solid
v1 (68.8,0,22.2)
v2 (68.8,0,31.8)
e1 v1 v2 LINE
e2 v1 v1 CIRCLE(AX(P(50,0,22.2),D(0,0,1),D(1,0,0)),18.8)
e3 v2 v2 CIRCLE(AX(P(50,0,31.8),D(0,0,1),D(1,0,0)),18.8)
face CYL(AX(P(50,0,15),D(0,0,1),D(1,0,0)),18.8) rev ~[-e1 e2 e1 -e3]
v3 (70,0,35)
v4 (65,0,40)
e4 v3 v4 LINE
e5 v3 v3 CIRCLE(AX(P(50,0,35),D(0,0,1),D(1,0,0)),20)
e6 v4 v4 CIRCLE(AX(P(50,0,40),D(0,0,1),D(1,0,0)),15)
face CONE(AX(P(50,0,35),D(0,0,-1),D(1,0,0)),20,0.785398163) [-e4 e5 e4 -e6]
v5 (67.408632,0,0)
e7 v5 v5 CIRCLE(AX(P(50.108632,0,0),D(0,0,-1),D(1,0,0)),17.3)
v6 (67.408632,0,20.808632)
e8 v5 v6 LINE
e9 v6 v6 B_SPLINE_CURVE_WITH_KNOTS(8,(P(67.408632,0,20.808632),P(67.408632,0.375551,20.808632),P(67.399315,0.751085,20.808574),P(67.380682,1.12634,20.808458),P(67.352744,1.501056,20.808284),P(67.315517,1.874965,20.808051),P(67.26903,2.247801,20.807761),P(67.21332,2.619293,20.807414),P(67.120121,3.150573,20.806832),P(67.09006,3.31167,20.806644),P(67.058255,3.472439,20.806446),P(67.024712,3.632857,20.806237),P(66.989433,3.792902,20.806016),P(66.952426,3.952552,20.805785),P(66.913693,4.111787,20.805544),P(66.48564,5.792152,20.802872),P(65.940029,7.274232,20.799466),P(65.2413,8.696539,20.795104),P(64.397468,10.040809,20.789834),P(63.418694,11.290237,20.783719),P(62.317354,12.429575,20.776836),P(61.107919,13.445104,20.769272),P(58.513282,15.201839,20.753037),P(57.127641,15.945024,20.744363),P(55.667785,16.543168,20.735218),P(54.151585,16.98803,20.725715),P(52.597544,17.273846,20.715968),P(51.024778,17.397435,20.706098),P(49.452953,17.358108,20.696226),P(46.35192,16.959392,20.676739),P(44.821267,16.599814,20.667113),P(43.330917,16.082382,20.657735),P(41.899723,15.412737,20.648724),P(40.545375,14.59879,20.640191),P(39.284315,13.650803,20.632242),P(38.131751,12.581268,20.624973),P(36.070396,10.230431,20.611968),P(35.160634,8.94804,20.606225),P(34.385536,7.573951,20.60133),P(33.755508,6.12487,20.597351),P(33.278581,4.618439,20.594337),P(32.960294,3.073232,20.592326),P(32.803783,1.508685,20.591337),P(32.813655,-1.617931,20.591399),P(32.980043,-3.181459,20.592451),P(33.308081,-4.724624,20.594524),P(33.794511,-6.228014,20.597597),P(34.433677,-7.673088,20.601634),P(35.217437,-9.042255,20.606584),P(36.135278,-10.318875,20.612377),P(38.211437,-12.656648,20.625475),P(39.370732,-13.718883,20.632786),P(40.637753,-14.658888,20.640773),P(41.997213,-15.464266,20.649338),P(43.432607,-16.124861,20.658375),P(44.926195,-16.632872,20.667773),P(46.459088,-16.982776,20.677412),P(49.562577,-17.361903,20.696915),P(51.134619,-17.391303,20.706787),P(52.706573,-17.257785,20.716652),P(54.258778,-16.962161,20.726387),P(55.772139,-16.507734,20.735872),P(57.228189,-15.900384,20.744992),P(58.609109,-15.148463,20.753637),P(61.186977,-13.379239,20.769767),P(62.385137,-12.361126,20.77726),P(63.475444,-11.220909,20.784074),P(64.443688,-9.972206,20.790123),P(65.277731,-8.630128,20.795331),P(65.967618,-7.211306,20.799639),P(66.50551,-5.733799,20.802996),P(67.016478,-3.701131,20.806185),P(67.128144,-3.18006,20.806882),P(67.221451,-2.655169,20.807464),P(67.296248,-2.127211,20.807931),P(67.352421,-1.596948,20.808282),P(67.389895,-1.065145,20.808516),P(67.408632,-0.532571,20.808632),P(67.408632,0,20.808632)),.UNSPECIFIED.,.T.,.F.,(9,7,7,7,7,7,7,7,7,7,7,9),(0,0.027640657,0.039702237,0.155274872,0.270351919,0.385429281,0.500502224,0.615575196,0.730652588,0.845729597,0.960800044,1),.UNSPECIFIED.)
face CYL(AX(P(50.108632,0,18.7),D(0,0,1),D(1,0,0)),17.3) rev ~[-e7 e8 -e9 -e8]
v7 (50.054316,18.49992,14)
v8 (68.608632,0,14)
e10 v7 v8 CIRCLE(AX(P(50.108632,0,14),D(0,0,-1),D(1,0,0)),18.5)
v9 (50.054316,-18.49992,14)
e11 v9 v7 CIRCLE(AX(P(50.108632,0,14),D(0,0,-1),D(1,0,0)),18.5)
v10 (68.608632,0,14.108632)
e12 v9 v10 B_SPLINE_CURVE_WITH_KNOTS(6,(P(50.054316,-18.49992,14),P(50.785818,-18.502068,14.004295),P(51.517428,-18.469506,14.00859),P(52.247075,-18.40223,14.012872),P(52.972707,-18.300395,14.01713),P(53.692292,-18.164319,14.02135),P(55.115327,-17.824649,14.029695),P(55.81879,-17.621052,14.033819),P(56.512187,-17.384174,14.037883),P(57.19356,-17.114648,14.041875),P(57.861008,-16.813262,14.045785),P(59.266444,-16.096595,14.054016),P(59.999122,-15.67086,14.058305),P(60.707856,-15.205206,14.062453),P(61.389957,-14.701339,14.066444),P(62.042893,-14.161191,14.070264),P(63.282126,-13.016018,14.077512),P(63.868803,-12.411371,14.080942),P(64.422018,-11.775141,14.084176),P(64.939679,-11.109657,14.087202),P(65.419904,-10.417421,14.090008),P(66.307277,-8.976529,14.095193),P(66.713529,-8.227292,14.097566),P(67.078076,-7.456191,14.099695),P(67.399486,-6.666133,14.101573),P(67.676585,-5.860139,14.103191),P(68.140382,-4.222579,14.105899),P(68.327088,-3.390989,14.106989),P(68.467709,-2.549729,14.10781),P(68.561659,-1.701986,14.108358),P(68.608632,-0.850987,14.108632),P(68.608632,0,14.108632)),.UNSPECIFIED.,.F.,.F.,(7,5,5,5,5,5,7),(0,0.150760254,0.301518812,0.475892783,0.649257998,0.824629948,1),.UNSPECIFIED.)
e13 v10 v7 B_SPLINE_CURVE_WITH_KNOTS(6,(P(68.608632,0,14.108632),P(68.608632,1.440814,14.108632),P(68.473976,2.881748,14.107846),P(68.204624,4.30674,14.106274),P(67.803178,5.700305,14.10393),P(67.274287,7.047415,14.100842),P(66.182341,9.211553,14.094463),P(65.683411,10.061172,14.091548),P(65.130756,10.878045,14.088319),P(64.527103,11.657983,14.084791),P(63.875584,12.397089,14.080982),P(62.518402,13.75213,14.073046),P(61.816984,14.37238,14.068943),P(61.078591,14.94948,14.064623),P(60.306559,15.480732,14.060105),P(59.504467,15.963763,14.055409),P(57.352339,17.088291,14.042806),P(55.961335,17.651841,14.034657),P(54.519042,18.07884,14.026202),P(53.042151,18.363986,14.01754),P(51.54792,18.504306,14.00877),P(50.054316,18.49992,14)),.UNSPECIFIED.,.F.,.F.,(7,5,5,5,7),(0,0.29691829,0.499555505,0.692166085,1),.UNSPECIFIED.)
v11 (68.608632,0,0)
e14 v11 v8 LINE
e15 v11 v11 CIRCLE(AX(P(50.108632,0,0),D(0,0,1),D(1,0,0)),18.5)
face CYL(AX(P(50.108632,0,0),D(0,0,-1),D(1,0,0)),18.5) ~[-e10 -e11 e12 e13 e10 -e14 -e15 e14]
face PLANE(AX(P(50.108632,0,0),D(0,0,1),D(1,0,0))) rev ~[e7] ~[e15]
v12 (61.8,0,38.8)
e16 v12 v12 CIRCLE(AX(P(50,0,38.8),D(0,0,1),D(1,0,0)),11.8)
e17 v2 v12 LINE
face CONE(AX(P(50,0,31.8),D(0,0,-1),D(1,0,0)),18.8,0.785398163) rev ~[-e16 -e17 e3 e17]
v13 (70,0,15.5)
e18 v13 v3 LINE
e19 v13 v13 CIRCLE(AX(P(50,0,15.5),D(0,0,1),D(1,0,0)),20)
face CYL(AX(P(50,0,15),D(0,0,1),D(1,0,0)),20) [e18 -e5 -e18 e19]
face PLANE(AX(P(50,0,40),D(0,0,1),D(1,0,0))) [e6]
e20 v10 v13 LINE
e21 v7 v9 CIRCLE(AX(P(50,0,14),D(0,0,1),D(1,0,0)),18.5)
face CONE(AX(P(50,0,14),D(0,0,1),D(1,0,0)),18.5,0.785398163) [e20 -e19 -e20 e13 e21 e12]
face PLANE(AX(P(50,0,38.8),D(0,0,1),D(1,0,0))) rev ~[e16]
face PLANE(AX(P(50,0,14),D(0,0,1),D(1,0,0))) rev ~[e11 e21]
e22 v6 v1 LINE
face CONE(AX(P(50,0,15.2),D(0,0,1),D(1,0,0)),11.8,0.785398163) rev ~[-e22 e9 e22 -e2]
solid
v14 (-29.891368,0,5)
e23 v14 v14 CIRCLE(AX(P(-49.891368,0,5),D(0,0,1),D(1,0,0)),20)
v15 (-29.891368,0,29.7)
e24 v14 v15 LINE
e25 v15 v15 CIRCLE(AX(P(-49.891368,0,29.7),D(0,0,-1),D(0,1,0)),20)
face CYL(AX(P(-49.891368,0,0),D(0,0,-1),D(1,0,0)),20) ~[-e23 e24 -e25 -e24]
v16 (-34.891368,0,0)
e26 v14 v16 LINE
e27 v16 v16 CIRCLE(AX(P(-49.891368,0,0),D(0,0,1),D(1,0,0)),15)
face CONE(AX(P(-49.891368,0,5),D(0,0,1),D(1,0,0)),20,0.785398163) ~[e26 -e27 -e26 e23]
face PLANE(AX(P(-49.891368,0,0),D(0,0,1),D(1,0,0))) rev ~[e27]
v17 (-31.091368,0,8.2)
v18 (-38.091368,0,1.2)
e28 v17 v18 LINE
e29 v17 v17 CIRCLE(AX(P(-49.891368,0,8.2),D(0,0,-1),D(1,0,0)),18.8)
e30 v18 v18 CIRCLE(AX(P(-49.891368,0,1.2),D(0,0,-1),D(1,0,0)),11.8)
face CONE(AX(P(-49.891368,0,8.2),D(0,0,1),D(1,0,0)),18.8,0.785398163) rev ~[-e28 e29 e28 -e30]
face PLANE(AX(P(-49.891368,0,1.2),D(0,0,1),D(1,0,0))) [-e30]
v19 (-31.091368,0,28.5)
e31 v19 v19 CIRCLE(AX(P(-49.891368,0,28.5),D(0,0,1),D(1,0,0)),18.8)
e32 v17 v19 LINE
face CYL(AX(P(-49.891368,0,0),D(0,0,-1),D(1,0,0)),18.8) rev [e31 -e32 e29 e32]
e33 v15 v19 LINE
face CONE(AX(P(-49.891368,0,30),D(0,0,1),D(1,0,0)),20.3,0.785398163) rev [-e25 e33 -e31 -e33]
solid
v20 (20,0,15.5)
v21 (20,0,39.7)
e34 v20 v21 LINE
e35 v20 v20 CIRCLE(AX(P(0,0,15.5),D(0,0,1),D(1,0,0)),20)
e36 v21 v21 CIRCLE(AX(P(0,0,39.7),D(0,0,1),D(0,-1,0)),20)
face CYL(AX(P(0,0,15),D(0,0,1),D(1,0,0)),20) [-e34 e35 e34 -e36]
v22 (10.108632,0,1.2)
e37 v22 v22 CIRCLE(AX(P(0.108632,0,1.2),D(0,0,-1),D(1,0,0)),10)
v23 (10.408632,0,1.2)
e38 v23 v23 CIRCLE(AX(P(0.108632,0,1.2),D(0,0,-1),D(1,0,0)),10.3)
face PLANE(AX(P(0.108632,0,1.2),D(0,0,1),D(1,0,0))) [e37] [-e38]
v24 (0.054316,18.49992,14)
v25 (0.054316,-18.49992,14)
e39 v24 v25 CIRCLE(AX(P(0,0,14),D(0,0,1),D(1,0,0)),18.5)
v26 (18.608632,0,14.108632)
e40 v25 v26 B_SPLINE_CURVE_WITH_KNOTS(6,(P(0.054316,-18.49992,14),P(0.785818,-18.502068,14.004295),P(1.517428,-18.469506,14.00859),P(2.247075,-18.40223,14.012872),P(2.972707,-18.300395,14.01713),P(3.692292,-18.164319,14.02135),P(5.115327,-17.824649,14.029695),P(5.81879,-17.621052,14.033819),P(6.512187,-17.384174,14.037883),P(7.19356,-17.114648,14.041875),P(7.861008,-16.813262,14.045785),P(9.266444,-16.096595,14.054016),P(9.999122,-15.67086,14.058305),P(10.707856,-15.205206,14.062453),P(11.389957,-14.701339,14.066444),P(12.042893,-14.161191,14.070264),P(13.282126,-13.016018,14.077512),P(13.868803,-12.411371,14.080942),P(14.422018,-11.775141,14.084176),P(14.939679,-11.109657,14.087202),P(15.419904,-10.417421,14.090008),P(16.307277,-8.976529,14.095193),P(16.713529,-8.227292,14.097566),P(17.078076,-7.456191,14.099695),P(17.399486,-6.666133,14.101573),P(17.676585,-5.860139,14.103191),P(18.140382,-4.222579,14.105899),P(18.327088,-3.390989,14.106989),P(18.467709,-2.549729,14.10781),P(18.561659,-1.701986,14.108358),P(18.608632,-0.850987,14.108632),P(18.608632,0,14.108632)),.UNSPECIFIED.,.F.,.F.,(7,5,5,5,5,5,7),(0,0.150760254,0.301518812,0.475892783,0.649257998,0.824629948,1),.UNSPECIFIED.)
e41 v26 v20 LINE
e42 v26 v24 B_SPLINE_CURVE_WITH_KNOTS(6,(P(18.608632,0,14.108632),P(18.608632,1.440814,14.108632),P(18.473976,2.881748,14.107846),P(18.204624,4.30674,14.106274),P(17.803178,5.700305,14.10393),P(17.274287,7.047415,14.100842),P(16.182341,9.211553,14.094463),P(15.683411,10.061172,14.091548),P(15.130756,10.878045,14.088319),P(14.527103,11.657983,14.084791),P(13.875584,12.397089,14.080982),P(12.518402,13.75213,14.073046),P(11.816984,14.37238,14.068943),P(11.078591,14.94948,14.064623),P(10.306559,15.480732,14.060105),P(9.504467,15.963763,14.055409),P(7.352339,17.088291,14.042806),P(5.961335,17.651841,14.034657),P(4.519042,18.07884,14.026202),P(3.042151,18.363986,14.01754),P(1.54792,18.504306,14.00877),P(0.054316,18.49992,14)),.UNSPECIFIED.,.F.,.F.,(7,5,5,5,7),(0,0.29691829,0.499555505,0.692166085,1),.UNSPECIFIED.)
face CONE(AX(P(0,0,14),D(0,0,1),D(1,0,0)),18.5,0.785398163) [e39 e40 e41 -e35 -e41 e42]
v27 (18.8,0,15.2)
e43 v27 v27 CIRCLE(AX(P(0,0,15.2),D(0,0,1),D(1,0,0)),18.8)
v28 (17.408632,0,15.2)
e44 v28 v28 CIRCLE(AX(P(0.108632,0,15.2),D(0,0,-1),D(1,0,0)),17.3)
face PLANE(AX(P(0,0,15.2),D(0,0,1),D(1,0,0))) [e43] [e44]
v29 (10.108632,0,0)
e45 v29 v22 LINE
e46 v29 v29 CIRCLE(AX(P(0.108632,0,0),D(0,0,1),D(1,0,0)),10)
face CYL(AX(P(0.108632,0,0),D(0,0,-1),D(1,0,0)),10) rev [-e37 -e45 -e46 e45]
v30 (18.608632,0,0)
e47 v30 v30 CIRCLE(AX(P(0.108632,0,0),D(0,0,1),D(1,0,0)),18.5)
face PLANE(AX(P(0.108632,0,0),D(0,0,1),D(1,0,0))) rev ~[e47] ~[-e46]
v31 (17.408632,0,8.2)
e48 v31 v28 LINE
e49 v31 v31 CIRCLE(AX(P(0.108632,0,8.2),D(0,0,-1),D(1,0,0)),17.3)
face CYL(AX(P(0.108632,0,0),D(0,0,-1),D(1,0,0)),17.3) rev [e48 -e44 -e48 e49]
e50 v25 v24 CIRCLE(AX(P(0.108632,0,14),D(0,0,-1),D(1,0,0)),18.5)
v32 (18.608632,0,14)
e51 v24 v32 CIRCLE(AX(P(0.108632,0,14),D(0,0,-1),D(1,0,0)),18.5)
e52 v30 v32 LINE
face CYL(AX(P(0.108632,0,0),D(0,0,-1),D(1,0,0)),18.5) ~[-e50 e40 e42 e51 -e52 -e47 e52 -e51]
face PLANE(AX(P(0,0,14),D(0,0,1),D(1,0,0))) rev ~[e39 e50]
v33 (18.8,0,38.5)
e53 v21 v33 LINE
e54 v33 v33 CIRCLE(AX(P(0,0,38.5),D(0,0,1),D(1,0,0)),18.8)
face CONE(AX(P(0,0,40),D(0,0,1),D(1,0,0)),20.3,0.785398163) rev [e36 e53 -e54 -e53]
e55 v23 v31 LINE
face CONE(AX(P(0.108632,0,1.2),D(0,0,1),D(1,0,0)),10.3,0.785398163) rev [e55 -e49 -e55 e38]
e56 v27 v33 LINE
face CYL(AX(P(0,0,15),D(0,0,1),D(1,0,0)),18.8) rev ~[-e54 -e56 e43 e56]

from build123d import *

# Parameters (mm, degrees)
F0_R          = 20
F1_DEPTH      = 30
F0_R_2        = 18.5
F0_R_3        = 10
F2_DEPTH      = 15
F3_R          = 20
F4_DEPTH      = 25
F4_DEPTH_BACK = 1
F3_R_2        = 18.5
F5_T          = -1.2
F5_2_T        = -1.2
F5_3_T        = -1.2
F6_DEPTH      = 25.0000003725
F7_3_S7_R     = 17.3
F7_3_T8_DEPTH = 28
F8_2_S5_R     = 18.5
F8_2_T6_DEPTH = 30
F8_3_S5_R     = 18.5
F8_3_T6_DEPTH = 30
F9_SIZE       = 5
F9_2_SIZE     = 5


# Not quite as in the source:
# - a fillet or chamfer that OpenCascade refuses, or shapes differently, is made with other operations: its cross-section is extruded or revolved along the edge and cut away or added


with BuildPart() as f1:
    # F0 (on Top) → F1 (new body)
    with BuildSketch(Plane.XY):
        with Locations((-49.8913675547, 0)):
            Circle(F0_R)
    extrude(amount=F1_DEPTH)

    # F5
    f5_openings = [f1.faces().sort_by_distance(p)[0] for p in [
        (-49.891368, 0, 30),
    ]]
    offset(amount=F5_T, openings=f5_openings)

    # F7: chamfer of 7 on 1 edges, made by hand

    # F7_s1 → F7_t2 (revolve)
    with BuildSketch(Plane.XZ):
        Polygon((-31.0913675547, 8.2), (-38.0913675547, 1.2), (-31.0913675547, 1.2), align=None)
    revolve(axis=Axis((-49.8913675547, 0, 1.2), (0, 0, -1)))

    # F8: chamfer of 1.5 on 1 edges, made by hand

    # F8_s1 → F8_t2 (revolve, cut)
    with BuildSketch(Plane.XZ):
        Polygon((-29.5913675547, 30), (-31.0913675547, 28.5), (-31.0913675547, 30), align=None)
    revolve(axis=Axis((-49.8913675547, 0, 30), (0, 0, 1)), mode=Mode.SUBTRACT)

    # F9
    f9_edges = [f1.edges().sort_by_distance(p)[0] for p in [
        (-69.891368, 0, 0),
    ]]
    chamfer(f9_edges, length=F9_SIZE)


with BuildPart() as f2:
    # F0 (on Top) → F2 (new body)
    with BuildSketch(Plane.XY):
        with Locations((0.1086324453, 0)):
            Circle(F0_R_2)
        with Locations((0.1086324453, 0)):
            Circle(F0_R_3, mode=Mode.SUBTRACT)
        with Locations((0.1086324453, 0)):
            Circle(F0_R_3)
    extrude(amount=F2_DEPTH)

    # F3 (on face) → F4, piece 2 (join, two sides)
    with BuildSketch(Plane.XY.offset(15)) as f4_2_sk:
        Circle(F3_R)
        with Locations((0.1086324453, 0)):
            Circle(F3_R_2, mode=Mode.SUBTRACT)
        with Locations((0.1086324453, 0)):
            Circle(F3_R_2)
    extrude(amount=F4_DEPTH)
    extrude(f4_2_sk.sketch, amount=-F4_DEPTH_BACK)

    # F5#2
    f5_2_openings = [f2.faces().sort_by_distance(p)[0] for p in [
        (0, 0, 40),
    ]]
    offset(amount=F5_2_T, openings=f5_2_openings, kind=Kind.INTERSECTION)

    # F0 (on Top) → F6 (cut)
    with BuildSketch(Plane.XY):
        with Locations((0.1086324453, 0)):
            Circle(F0_R_3)
    extrude(amount=F6_DEPTH, mode=Mode.SUBTRACT)

    # F7#2: chamfer of 7 on 2 edges, made by hand

    # F7_2_s1 → F7_2_t2 (revolve)
    with BuildSketch(Plane.XZ):
        Polygon((10.4086324453, 1.2), (17.4086324453, 8.2), (17.4086324453, 1.2), align=None)
    revolve(axis=Axis((0.1086324453, 0, 1.2), (0, 0, -1)))

    # F8#2: chamfer of 1.5 on 2 edges, made by hand


with BuildPart() as f2b:
    # F0 (on Top) → F2, piece 2 (new body)
    with BuildSketch(Plane.XY):
        with Locations((50.1086324453, 0)):
            Circle(F0_R_2)
    extrude(amount=F2_DEPTH)

    # F3 (on face) → F4 (join, two sides)
    with BuildSketch(Plane.XY.offset(15)) as f4_sk:
        with Locations((50, 0)):
            Circle(F3_R)
    extrude(amount=F4_DEPTH)
    extrude(f4_sk.sketch, amount=-F4_DEPTH_BACK)

    # F5#3
    f5_3_openings = [f2b.faces().sort_by_distance(p)[0] for p in [
        (50.108632, 0, 0),
    ]]
    offset(amount=F5_3_T, openings=f5_3_openings, kind=Kind.INTERSECTION)

    # F7#3: chamfer of 7 on 3 edges, made by hand

    # F7_3_s1 → F7_3_t2 (revolve)
    with BuildSketch(Plane.XZ):
        Polygon((68.8, 31.8), (61.8, 38.8), (68.8, 38.8), align=None)
    revolve(axis=Axis((50, 0, 38.8), (0, 0, 1)))


with BuildPart() as f7_3_tool4:
    # F7_3_s5 → F7_3_t6 (revolve)
    with BuildSketch(Plane.XZ):
        Polygon((61.8, 15.2), (68.8, 22.2), (68.8, 15.2), align=None)
    revolve(axis=Axis((50, 0, 15.2), (0, 0, 1)))

    # F7_3_s7 → F7_3_t8 (cut, symmetric)
    with BuildSketch(Plane.XY.offset(18.7)):
        with Locations((50.1086324453, 0)):
            Circle(F7_3_S7_R)
    extrude(amount=F7_3_T8_DEPTH, both=True, mode=Mode.SUBTRACT)


with BuildPart() as f2b_1:
    add(f2b.part)

    # F7_3_t3: union F7_3_tool4
    add(f7_3_tool4.part)

    # F8#3: chamfer of 1.5 on 1 edges, made by hand


with BuildPart() as f8_2_tool2:
    # F8_2_s3 → F8_2_t4 (revolve)
    with BuildSketch(Plane.XZ):
        Polygon((18.5, 14), (20, 15.5), (20, 14), align=None)
    revolve(axis=Axis((0, 0, 14), (0, 0, 1)))

    # F8_2_s5 → F8_2_t6 (cut, symmetric)
    with BuildSketch(Plane.XY.offset(14.8)):
        with Locations((0.1086324453, 0)):
            Circle(F8_2_S5_R)
    extrude(amount=F8_2_T6_DEPTH, both=True, mode=Mode.SUBTRACT)


with BuildPart() as f2_1:
    add(f2.part)

    # F8_2_t1: cut F8_2_tool2
    add(f8_2_tool2.part, mode=Mode.SUBTRACT)

    # F8_2_s7 → F8_2_t8 (revolve, cut)
    with BuildSketch(Plane.XZ):
        Polygon((20.3, 40), (18.8, 38.5), (18.8, 40), align=None)
    revolve(axis=Axis((0, 0, 40), (0, 0, 1)), mode=Mode.SUBTRACT)


with BuildPart() as f8_3_tool2:
    # F8_3_s3 → F8_3_t4 (revolve)
    with BuildSketch(Plane.XZ):
        Polygon((68.5, 14), (70, 15.5), (70, 14), align=None)
    revolve(axis=Axis((50, 0, 14), (0, 0, 1)))

    # F8_3_s5 → F8_3_t6 (cut, symmetric)
    with BuildSketch(Plane.XY.offset(14.8)):
        with Locations((50.1086324453, 0)):
            Circle(F8_3_S5_R)
    extrude(amount=F8_3_T6_DEPTH, both=True, mode=Mode.SUBTRACT)


with BuildPart() as f2b_2:
    add(f2b_1.part)

    # F8_3_t1: cut F8_3_tool2
    add(f8_3_tool2.part, mode=Mode.SUBTRACT)

    # F9#2
    f9_2_edges = [f2b_2.edges().sort_by_distance(p)[0] for p in [
        (30, 0, 40),
    ]]
    chamfer(f9_2_edges, length=F9_2_SIZE)


solid = Compound([f1.part, f2_1.part, f2b_2.part])
